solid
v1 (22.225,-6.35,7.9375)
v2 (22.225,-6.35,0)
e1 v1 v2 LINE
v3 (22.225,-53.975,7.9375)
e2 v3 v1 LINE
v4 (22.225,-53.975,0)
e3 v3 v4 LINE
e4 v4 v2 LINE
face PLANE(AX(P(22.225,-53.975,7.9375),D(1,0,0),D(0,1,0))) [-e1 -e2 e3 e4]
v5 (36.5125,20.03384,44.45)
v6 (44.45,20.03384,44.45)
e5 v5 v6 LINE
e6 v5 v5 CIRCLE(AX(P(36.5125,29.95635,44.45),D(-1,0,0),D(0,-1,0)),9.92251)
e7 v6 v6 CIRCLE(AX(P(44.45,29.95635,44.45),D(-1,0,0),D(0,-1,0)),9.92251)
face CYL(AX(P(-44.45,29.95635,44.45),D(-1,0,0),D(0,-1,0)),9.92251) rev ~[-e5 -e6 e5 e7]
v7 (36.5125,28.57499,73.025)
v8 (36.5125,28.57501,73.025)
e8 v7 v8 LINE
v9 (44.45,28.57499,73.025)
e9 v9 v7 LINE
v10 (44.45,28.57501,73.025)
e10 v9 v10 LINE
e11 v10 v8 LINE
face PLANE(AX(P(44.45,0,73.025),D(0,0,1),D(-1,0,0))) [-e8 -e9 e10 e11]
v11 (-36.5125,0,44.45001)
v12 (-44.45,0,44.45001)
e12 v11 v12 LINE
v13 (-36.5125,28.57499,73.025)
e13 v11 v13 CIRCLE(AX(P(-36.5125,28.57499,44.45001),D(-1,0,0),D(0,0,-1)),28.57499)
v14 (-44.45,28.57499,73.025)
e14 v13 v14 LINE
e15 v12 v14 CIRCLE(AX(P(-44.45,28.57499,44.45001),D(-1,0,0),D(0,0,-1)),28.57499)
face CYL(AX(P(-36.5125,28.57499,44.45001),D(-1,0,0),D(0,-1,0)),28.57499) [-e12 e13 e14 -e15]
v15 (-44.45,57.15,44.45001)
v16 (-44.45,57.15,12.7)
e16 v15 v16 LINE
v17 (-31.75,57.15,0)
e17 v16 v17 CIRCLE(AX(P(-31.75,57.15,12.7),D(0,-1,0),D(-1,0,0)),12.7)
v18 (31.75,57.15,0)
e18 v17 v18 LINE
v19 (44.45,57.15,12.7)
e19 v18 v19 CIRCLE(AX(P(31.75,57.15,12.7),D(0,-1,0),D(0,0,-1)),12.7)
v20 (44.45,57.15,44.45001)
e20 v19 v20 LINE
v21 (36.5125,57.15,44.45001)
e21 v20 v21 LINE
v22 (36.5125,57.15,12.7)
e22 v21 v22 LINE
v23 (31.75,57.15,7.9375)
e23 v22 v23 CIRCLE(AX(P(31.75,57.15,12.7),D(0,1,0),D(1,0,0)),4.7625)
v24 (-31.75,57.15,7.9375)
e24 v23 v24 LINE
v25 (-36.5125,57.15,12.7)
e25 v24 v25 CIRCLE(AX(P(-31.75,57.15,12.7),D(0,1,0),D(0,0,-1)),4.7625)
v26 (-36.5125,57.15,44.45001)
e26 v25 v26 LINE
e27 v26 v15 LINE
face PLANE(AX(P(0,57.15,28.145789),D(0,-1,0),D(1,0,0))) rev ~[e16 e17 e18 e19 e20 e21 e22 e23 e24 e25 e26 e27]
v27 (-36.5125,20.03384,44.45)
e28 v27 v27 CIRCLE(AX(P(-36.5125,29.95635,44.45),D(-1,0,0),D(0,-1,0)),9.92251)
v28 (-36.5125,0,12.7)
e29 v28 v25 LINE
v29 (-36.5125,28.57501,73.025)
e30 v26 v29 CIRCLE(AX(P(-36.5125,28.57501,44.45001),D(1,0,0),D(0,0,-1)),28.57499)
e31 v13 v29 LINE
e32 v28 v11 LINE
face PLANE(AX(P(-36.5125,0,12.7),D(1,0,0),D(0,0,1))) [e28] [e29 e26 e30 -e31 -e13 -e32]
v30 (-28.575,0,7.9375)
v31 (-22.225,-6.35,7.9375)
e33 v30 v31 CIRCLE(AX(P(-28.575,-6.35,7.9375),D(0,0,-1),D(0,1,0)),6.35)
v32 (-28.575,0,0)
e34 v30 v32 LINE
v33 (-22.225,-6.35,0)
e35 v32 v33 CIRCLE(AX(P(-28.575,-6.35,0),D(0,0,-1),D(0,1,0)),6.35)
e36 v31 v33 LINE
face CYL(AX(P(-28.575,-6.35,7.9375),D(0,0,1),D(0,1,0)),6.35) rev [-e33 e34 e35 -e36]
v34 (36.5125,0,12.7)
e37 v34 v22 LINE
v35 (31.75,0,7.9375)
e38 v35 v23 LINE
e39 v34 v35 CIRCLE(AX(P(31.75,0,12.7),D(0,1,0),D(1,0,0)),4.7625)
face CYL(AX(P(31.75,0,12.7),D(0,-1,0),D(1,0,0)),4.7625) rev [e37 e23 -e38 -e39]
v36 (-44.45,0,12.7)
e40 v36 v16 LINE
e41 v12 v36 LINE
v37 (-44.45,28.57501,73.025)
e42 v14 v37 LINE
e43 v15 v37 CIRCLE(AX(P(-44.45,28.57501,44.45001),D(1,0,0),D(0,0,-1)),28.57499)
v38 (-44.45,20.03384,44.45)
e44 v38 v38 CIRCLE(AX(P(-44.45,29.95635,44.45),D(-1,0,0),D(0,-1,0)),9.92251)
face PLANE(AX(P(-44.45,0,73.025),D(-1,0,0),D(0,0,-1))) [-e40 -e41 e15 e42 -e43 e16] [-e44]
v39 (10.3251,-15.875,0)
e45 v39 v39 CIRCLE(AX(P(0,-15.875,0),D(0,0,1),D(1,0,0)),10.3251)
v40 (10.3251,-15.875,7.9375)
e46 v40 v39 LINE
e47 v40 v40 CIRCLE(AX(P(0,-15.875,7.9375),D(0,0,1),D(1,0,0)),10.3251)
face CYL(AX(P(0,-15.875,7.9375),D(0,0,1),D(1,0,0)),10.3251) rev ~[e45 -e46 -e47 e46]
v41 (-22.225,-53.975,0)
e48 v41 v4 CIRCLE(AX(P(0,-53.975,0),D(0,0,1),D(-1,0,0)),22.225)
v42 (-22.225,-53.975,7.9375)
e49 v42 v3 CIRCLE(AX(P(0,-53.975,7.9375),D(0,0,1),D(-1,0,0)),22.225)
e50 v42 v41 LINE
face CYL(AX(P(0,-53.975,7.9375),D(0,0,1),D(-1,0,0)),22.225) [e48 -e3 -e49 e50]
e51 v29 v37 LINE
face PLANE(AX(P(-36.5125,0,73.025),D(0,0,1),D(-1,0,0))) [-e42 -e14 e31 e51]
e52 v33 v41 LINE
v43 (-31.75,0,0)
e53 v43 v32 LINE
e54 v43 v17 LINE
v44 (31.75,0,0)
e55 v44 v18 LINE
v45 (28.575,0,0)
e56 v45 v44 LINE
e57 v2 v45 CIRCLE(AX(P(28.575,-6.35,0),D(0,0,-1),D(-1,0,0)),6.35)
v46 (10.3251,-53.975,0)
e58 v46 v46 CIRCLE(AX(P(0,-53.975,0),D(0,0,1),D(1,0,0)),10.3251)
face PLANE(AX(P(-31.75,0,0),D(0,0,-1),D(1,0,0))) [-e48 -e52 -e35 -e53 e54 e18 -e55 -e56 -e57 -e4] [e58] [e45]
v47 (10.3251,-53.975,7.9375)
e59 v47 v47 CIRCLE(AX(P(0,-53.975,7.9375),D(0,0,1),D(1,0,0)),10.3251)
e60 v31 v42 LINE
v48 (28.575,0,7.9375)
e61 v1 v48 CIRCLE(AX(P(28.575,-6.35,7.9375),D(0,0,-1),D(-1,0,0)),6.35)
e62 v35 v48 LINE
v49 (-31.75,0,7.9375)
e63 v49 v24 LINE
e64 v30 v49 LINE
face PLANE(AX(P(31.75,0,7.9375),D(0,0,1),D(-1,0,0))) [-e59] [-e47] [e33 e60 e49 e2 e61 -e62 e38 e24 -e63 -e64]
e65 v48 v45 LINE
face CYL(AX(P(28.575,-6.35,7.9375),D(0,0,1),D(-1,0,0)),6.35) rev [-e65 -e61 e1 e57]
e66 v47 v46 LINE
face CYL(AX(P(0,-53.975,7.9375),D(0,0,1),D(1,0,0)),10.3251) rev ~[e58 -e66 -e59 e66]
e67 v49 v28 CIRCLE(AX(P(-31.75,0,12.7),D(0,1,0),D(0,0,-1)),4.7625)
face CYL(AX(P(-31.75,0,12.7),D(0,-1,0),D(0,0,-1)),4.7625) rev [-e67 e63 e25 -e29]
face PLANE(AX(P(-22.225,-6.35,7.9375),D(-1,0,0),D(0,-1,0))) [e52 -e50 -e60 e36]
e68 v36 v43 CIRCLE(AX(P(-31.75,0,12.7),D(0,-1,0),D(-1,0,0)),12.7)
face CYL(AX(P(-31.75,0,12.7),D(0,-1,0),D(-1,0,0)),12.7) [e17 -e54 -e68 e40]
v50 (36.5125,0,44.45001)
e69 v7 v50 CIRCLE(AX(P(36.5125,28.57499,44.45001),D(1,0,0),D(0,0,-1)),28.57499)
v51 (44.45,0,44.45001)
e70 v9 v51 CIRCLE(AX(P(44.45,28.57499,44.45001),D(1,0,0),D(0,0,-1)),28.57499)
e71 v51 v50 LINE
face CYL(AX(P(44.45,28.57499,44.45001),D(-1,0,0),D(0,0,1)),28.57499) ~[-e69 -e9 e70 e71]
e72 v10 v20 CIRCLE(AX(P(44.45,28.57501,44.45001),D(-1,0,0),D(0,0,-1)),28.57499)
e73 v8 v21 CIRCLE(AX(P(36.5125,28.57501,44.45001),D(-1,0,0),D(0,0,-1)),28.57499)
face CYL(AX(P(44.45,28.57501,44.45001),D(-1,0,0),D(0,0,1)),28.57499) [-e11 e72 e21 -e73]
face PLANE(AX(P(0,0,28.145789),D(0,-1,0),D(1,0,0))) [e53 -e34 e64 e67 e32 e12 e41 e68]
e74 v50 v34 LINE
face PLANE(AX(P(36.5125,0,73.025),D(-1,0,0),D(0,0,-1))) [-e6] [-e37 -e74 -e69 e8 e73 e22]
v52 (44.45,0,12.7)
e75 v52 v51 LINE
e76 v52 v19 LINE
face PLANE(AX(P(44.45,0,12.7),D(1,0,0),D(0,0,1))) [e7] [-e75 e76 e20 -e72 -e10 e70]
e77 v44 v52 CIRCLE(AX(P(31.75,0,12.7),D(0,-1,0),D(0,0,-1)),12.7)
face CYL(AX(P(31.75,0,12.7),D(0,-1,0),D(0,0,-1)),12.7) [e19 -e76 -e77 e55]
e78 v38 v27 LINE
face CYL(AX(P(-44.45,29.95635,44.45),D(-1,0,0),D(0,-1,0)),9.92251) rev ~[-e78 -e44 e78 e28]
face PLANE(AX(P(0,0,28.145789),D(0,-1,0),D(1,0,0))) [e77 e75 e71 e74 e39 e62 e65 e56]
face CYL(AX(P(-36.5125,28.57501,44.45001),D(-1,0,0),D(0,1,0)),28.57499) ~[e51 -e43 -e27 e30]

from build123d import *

# Parameters (mm, degrees)
F1_DEPTH = 57.15
F2_R     = 28.57499
F3_R     = 28.57499
F4_R     = 9.92251
F5_DEPTH = 88.901
F6_R     = 10.3251
F7_DEPTH = 7.9375


# Not quite as in the source:
# - a fillet or chamfer is up to 0.001 mm smaller than in the source, because OpenCascade refuses the exact size


with BuildPart() as f1:
    # F0 (on Front) → F1 (new body)
    with BuildSketch(Plane.XZ):
        with BuildLine():
            ThreePointArc((-44.45, 12.7), (-40.7302561211, 3.7197438789), (-31.75, 0))
            Line((-31.75, 0), (31.75, 0))
            ThreePointArc((31.75, 0), (40.7302561211, 3.7197438789), (44.45, 12.7))
            Line((44.45, 12.7), (44.45, 73.025))
            Line((44.45, 73.025), (36.5125, 73.025))
            Line((36.5125, 73.025), (36.5125, 12.7))
            ThreePointArc((36.5125, 12.7), (35.1175960454, 9.3324039546), (31.75, 7.9375))
            Line((31.75, 7.9375), (-31.75, 7.9375))
            ThreePointArc((-31.75, 7.9375), (-35.1175960454, 9.3324039546), (-36.5125, 12.7))
            Line((-36.5125, 12.7), (-36.5125, 73.025))
            Line((-36.5125, 73.025), (-44.45, 73.025))
            Line((-44.45, 73.025), (-44.45, 12.7))
        make_face()
    extrude(amount=-F1_DEPTH)

    # F2 (radius 28.575 in the source; OpenCascade refuses exactly that, so slightly less here)
    f2_edges = [f1.edges().sort_by_distance(p)[0] for p in [
        (40.48125, 0, 73.025),
        (40.48125, 57.15, 73.025),
    ]]
    fillet(f2_edges, radius=F2_R)

    # F3 (radius 28.575 in the source; OpenCascade refuses exactly that, so slightly less here)
    f3_edges = [f1.edges().sort_by_distance(p)[0] for p in [
        (-40.48125, 0, 73.025),
        (-40.48125, 57.15, 73.025),
    ]]
    fillet(f3_edges, radius=F3_R)

    # F4 (on face) → F5 (cut, through all)
    with BuildSketch(Plane(origin=(-44.45, 0, 0), x_dir=(0, -1, 0), z_dir=(-1, 0, 0))):
        with Locations((-29.956350103, 44.45)):
            Circle(F4_R)
    extrude(amount=-F5_DEPTH, mode=Mode.SUBTRACT)

    # F6 (on face) → F7 (join, through all)
    with BuildSketch(Plane.XY.offset(7.9375)):
        with BuildLine():
            Line((22.225, -53.975), (22.225, -6.35))
            ThreePointArc((22.225, -6.35), (24.0848719395, -1.8598719395), (28.575, 0))
            Line((28.575, 0), (-28.575, 0))
            ThreePointArc((-28.575, 0), (-24.0848719395, -1.8598719395), (-22.225, -6.35))
            Line((-22.225, -6.35), (-22.225, -53.975))
            ThreePointArc((-22.225, -53.975), (0, -76.2), (22.225, -53.975))
        make_face()
        with Locations((0, -53.975)):
            Circle(F6_R, mode=Mode.SUBTRACT)
        with Locations((0, -15.875)):
            Circle(F6_R, mode=Mode.SUBTRACT)
    extrude(amount=-F7_DEPTH)


solid = f1.part
